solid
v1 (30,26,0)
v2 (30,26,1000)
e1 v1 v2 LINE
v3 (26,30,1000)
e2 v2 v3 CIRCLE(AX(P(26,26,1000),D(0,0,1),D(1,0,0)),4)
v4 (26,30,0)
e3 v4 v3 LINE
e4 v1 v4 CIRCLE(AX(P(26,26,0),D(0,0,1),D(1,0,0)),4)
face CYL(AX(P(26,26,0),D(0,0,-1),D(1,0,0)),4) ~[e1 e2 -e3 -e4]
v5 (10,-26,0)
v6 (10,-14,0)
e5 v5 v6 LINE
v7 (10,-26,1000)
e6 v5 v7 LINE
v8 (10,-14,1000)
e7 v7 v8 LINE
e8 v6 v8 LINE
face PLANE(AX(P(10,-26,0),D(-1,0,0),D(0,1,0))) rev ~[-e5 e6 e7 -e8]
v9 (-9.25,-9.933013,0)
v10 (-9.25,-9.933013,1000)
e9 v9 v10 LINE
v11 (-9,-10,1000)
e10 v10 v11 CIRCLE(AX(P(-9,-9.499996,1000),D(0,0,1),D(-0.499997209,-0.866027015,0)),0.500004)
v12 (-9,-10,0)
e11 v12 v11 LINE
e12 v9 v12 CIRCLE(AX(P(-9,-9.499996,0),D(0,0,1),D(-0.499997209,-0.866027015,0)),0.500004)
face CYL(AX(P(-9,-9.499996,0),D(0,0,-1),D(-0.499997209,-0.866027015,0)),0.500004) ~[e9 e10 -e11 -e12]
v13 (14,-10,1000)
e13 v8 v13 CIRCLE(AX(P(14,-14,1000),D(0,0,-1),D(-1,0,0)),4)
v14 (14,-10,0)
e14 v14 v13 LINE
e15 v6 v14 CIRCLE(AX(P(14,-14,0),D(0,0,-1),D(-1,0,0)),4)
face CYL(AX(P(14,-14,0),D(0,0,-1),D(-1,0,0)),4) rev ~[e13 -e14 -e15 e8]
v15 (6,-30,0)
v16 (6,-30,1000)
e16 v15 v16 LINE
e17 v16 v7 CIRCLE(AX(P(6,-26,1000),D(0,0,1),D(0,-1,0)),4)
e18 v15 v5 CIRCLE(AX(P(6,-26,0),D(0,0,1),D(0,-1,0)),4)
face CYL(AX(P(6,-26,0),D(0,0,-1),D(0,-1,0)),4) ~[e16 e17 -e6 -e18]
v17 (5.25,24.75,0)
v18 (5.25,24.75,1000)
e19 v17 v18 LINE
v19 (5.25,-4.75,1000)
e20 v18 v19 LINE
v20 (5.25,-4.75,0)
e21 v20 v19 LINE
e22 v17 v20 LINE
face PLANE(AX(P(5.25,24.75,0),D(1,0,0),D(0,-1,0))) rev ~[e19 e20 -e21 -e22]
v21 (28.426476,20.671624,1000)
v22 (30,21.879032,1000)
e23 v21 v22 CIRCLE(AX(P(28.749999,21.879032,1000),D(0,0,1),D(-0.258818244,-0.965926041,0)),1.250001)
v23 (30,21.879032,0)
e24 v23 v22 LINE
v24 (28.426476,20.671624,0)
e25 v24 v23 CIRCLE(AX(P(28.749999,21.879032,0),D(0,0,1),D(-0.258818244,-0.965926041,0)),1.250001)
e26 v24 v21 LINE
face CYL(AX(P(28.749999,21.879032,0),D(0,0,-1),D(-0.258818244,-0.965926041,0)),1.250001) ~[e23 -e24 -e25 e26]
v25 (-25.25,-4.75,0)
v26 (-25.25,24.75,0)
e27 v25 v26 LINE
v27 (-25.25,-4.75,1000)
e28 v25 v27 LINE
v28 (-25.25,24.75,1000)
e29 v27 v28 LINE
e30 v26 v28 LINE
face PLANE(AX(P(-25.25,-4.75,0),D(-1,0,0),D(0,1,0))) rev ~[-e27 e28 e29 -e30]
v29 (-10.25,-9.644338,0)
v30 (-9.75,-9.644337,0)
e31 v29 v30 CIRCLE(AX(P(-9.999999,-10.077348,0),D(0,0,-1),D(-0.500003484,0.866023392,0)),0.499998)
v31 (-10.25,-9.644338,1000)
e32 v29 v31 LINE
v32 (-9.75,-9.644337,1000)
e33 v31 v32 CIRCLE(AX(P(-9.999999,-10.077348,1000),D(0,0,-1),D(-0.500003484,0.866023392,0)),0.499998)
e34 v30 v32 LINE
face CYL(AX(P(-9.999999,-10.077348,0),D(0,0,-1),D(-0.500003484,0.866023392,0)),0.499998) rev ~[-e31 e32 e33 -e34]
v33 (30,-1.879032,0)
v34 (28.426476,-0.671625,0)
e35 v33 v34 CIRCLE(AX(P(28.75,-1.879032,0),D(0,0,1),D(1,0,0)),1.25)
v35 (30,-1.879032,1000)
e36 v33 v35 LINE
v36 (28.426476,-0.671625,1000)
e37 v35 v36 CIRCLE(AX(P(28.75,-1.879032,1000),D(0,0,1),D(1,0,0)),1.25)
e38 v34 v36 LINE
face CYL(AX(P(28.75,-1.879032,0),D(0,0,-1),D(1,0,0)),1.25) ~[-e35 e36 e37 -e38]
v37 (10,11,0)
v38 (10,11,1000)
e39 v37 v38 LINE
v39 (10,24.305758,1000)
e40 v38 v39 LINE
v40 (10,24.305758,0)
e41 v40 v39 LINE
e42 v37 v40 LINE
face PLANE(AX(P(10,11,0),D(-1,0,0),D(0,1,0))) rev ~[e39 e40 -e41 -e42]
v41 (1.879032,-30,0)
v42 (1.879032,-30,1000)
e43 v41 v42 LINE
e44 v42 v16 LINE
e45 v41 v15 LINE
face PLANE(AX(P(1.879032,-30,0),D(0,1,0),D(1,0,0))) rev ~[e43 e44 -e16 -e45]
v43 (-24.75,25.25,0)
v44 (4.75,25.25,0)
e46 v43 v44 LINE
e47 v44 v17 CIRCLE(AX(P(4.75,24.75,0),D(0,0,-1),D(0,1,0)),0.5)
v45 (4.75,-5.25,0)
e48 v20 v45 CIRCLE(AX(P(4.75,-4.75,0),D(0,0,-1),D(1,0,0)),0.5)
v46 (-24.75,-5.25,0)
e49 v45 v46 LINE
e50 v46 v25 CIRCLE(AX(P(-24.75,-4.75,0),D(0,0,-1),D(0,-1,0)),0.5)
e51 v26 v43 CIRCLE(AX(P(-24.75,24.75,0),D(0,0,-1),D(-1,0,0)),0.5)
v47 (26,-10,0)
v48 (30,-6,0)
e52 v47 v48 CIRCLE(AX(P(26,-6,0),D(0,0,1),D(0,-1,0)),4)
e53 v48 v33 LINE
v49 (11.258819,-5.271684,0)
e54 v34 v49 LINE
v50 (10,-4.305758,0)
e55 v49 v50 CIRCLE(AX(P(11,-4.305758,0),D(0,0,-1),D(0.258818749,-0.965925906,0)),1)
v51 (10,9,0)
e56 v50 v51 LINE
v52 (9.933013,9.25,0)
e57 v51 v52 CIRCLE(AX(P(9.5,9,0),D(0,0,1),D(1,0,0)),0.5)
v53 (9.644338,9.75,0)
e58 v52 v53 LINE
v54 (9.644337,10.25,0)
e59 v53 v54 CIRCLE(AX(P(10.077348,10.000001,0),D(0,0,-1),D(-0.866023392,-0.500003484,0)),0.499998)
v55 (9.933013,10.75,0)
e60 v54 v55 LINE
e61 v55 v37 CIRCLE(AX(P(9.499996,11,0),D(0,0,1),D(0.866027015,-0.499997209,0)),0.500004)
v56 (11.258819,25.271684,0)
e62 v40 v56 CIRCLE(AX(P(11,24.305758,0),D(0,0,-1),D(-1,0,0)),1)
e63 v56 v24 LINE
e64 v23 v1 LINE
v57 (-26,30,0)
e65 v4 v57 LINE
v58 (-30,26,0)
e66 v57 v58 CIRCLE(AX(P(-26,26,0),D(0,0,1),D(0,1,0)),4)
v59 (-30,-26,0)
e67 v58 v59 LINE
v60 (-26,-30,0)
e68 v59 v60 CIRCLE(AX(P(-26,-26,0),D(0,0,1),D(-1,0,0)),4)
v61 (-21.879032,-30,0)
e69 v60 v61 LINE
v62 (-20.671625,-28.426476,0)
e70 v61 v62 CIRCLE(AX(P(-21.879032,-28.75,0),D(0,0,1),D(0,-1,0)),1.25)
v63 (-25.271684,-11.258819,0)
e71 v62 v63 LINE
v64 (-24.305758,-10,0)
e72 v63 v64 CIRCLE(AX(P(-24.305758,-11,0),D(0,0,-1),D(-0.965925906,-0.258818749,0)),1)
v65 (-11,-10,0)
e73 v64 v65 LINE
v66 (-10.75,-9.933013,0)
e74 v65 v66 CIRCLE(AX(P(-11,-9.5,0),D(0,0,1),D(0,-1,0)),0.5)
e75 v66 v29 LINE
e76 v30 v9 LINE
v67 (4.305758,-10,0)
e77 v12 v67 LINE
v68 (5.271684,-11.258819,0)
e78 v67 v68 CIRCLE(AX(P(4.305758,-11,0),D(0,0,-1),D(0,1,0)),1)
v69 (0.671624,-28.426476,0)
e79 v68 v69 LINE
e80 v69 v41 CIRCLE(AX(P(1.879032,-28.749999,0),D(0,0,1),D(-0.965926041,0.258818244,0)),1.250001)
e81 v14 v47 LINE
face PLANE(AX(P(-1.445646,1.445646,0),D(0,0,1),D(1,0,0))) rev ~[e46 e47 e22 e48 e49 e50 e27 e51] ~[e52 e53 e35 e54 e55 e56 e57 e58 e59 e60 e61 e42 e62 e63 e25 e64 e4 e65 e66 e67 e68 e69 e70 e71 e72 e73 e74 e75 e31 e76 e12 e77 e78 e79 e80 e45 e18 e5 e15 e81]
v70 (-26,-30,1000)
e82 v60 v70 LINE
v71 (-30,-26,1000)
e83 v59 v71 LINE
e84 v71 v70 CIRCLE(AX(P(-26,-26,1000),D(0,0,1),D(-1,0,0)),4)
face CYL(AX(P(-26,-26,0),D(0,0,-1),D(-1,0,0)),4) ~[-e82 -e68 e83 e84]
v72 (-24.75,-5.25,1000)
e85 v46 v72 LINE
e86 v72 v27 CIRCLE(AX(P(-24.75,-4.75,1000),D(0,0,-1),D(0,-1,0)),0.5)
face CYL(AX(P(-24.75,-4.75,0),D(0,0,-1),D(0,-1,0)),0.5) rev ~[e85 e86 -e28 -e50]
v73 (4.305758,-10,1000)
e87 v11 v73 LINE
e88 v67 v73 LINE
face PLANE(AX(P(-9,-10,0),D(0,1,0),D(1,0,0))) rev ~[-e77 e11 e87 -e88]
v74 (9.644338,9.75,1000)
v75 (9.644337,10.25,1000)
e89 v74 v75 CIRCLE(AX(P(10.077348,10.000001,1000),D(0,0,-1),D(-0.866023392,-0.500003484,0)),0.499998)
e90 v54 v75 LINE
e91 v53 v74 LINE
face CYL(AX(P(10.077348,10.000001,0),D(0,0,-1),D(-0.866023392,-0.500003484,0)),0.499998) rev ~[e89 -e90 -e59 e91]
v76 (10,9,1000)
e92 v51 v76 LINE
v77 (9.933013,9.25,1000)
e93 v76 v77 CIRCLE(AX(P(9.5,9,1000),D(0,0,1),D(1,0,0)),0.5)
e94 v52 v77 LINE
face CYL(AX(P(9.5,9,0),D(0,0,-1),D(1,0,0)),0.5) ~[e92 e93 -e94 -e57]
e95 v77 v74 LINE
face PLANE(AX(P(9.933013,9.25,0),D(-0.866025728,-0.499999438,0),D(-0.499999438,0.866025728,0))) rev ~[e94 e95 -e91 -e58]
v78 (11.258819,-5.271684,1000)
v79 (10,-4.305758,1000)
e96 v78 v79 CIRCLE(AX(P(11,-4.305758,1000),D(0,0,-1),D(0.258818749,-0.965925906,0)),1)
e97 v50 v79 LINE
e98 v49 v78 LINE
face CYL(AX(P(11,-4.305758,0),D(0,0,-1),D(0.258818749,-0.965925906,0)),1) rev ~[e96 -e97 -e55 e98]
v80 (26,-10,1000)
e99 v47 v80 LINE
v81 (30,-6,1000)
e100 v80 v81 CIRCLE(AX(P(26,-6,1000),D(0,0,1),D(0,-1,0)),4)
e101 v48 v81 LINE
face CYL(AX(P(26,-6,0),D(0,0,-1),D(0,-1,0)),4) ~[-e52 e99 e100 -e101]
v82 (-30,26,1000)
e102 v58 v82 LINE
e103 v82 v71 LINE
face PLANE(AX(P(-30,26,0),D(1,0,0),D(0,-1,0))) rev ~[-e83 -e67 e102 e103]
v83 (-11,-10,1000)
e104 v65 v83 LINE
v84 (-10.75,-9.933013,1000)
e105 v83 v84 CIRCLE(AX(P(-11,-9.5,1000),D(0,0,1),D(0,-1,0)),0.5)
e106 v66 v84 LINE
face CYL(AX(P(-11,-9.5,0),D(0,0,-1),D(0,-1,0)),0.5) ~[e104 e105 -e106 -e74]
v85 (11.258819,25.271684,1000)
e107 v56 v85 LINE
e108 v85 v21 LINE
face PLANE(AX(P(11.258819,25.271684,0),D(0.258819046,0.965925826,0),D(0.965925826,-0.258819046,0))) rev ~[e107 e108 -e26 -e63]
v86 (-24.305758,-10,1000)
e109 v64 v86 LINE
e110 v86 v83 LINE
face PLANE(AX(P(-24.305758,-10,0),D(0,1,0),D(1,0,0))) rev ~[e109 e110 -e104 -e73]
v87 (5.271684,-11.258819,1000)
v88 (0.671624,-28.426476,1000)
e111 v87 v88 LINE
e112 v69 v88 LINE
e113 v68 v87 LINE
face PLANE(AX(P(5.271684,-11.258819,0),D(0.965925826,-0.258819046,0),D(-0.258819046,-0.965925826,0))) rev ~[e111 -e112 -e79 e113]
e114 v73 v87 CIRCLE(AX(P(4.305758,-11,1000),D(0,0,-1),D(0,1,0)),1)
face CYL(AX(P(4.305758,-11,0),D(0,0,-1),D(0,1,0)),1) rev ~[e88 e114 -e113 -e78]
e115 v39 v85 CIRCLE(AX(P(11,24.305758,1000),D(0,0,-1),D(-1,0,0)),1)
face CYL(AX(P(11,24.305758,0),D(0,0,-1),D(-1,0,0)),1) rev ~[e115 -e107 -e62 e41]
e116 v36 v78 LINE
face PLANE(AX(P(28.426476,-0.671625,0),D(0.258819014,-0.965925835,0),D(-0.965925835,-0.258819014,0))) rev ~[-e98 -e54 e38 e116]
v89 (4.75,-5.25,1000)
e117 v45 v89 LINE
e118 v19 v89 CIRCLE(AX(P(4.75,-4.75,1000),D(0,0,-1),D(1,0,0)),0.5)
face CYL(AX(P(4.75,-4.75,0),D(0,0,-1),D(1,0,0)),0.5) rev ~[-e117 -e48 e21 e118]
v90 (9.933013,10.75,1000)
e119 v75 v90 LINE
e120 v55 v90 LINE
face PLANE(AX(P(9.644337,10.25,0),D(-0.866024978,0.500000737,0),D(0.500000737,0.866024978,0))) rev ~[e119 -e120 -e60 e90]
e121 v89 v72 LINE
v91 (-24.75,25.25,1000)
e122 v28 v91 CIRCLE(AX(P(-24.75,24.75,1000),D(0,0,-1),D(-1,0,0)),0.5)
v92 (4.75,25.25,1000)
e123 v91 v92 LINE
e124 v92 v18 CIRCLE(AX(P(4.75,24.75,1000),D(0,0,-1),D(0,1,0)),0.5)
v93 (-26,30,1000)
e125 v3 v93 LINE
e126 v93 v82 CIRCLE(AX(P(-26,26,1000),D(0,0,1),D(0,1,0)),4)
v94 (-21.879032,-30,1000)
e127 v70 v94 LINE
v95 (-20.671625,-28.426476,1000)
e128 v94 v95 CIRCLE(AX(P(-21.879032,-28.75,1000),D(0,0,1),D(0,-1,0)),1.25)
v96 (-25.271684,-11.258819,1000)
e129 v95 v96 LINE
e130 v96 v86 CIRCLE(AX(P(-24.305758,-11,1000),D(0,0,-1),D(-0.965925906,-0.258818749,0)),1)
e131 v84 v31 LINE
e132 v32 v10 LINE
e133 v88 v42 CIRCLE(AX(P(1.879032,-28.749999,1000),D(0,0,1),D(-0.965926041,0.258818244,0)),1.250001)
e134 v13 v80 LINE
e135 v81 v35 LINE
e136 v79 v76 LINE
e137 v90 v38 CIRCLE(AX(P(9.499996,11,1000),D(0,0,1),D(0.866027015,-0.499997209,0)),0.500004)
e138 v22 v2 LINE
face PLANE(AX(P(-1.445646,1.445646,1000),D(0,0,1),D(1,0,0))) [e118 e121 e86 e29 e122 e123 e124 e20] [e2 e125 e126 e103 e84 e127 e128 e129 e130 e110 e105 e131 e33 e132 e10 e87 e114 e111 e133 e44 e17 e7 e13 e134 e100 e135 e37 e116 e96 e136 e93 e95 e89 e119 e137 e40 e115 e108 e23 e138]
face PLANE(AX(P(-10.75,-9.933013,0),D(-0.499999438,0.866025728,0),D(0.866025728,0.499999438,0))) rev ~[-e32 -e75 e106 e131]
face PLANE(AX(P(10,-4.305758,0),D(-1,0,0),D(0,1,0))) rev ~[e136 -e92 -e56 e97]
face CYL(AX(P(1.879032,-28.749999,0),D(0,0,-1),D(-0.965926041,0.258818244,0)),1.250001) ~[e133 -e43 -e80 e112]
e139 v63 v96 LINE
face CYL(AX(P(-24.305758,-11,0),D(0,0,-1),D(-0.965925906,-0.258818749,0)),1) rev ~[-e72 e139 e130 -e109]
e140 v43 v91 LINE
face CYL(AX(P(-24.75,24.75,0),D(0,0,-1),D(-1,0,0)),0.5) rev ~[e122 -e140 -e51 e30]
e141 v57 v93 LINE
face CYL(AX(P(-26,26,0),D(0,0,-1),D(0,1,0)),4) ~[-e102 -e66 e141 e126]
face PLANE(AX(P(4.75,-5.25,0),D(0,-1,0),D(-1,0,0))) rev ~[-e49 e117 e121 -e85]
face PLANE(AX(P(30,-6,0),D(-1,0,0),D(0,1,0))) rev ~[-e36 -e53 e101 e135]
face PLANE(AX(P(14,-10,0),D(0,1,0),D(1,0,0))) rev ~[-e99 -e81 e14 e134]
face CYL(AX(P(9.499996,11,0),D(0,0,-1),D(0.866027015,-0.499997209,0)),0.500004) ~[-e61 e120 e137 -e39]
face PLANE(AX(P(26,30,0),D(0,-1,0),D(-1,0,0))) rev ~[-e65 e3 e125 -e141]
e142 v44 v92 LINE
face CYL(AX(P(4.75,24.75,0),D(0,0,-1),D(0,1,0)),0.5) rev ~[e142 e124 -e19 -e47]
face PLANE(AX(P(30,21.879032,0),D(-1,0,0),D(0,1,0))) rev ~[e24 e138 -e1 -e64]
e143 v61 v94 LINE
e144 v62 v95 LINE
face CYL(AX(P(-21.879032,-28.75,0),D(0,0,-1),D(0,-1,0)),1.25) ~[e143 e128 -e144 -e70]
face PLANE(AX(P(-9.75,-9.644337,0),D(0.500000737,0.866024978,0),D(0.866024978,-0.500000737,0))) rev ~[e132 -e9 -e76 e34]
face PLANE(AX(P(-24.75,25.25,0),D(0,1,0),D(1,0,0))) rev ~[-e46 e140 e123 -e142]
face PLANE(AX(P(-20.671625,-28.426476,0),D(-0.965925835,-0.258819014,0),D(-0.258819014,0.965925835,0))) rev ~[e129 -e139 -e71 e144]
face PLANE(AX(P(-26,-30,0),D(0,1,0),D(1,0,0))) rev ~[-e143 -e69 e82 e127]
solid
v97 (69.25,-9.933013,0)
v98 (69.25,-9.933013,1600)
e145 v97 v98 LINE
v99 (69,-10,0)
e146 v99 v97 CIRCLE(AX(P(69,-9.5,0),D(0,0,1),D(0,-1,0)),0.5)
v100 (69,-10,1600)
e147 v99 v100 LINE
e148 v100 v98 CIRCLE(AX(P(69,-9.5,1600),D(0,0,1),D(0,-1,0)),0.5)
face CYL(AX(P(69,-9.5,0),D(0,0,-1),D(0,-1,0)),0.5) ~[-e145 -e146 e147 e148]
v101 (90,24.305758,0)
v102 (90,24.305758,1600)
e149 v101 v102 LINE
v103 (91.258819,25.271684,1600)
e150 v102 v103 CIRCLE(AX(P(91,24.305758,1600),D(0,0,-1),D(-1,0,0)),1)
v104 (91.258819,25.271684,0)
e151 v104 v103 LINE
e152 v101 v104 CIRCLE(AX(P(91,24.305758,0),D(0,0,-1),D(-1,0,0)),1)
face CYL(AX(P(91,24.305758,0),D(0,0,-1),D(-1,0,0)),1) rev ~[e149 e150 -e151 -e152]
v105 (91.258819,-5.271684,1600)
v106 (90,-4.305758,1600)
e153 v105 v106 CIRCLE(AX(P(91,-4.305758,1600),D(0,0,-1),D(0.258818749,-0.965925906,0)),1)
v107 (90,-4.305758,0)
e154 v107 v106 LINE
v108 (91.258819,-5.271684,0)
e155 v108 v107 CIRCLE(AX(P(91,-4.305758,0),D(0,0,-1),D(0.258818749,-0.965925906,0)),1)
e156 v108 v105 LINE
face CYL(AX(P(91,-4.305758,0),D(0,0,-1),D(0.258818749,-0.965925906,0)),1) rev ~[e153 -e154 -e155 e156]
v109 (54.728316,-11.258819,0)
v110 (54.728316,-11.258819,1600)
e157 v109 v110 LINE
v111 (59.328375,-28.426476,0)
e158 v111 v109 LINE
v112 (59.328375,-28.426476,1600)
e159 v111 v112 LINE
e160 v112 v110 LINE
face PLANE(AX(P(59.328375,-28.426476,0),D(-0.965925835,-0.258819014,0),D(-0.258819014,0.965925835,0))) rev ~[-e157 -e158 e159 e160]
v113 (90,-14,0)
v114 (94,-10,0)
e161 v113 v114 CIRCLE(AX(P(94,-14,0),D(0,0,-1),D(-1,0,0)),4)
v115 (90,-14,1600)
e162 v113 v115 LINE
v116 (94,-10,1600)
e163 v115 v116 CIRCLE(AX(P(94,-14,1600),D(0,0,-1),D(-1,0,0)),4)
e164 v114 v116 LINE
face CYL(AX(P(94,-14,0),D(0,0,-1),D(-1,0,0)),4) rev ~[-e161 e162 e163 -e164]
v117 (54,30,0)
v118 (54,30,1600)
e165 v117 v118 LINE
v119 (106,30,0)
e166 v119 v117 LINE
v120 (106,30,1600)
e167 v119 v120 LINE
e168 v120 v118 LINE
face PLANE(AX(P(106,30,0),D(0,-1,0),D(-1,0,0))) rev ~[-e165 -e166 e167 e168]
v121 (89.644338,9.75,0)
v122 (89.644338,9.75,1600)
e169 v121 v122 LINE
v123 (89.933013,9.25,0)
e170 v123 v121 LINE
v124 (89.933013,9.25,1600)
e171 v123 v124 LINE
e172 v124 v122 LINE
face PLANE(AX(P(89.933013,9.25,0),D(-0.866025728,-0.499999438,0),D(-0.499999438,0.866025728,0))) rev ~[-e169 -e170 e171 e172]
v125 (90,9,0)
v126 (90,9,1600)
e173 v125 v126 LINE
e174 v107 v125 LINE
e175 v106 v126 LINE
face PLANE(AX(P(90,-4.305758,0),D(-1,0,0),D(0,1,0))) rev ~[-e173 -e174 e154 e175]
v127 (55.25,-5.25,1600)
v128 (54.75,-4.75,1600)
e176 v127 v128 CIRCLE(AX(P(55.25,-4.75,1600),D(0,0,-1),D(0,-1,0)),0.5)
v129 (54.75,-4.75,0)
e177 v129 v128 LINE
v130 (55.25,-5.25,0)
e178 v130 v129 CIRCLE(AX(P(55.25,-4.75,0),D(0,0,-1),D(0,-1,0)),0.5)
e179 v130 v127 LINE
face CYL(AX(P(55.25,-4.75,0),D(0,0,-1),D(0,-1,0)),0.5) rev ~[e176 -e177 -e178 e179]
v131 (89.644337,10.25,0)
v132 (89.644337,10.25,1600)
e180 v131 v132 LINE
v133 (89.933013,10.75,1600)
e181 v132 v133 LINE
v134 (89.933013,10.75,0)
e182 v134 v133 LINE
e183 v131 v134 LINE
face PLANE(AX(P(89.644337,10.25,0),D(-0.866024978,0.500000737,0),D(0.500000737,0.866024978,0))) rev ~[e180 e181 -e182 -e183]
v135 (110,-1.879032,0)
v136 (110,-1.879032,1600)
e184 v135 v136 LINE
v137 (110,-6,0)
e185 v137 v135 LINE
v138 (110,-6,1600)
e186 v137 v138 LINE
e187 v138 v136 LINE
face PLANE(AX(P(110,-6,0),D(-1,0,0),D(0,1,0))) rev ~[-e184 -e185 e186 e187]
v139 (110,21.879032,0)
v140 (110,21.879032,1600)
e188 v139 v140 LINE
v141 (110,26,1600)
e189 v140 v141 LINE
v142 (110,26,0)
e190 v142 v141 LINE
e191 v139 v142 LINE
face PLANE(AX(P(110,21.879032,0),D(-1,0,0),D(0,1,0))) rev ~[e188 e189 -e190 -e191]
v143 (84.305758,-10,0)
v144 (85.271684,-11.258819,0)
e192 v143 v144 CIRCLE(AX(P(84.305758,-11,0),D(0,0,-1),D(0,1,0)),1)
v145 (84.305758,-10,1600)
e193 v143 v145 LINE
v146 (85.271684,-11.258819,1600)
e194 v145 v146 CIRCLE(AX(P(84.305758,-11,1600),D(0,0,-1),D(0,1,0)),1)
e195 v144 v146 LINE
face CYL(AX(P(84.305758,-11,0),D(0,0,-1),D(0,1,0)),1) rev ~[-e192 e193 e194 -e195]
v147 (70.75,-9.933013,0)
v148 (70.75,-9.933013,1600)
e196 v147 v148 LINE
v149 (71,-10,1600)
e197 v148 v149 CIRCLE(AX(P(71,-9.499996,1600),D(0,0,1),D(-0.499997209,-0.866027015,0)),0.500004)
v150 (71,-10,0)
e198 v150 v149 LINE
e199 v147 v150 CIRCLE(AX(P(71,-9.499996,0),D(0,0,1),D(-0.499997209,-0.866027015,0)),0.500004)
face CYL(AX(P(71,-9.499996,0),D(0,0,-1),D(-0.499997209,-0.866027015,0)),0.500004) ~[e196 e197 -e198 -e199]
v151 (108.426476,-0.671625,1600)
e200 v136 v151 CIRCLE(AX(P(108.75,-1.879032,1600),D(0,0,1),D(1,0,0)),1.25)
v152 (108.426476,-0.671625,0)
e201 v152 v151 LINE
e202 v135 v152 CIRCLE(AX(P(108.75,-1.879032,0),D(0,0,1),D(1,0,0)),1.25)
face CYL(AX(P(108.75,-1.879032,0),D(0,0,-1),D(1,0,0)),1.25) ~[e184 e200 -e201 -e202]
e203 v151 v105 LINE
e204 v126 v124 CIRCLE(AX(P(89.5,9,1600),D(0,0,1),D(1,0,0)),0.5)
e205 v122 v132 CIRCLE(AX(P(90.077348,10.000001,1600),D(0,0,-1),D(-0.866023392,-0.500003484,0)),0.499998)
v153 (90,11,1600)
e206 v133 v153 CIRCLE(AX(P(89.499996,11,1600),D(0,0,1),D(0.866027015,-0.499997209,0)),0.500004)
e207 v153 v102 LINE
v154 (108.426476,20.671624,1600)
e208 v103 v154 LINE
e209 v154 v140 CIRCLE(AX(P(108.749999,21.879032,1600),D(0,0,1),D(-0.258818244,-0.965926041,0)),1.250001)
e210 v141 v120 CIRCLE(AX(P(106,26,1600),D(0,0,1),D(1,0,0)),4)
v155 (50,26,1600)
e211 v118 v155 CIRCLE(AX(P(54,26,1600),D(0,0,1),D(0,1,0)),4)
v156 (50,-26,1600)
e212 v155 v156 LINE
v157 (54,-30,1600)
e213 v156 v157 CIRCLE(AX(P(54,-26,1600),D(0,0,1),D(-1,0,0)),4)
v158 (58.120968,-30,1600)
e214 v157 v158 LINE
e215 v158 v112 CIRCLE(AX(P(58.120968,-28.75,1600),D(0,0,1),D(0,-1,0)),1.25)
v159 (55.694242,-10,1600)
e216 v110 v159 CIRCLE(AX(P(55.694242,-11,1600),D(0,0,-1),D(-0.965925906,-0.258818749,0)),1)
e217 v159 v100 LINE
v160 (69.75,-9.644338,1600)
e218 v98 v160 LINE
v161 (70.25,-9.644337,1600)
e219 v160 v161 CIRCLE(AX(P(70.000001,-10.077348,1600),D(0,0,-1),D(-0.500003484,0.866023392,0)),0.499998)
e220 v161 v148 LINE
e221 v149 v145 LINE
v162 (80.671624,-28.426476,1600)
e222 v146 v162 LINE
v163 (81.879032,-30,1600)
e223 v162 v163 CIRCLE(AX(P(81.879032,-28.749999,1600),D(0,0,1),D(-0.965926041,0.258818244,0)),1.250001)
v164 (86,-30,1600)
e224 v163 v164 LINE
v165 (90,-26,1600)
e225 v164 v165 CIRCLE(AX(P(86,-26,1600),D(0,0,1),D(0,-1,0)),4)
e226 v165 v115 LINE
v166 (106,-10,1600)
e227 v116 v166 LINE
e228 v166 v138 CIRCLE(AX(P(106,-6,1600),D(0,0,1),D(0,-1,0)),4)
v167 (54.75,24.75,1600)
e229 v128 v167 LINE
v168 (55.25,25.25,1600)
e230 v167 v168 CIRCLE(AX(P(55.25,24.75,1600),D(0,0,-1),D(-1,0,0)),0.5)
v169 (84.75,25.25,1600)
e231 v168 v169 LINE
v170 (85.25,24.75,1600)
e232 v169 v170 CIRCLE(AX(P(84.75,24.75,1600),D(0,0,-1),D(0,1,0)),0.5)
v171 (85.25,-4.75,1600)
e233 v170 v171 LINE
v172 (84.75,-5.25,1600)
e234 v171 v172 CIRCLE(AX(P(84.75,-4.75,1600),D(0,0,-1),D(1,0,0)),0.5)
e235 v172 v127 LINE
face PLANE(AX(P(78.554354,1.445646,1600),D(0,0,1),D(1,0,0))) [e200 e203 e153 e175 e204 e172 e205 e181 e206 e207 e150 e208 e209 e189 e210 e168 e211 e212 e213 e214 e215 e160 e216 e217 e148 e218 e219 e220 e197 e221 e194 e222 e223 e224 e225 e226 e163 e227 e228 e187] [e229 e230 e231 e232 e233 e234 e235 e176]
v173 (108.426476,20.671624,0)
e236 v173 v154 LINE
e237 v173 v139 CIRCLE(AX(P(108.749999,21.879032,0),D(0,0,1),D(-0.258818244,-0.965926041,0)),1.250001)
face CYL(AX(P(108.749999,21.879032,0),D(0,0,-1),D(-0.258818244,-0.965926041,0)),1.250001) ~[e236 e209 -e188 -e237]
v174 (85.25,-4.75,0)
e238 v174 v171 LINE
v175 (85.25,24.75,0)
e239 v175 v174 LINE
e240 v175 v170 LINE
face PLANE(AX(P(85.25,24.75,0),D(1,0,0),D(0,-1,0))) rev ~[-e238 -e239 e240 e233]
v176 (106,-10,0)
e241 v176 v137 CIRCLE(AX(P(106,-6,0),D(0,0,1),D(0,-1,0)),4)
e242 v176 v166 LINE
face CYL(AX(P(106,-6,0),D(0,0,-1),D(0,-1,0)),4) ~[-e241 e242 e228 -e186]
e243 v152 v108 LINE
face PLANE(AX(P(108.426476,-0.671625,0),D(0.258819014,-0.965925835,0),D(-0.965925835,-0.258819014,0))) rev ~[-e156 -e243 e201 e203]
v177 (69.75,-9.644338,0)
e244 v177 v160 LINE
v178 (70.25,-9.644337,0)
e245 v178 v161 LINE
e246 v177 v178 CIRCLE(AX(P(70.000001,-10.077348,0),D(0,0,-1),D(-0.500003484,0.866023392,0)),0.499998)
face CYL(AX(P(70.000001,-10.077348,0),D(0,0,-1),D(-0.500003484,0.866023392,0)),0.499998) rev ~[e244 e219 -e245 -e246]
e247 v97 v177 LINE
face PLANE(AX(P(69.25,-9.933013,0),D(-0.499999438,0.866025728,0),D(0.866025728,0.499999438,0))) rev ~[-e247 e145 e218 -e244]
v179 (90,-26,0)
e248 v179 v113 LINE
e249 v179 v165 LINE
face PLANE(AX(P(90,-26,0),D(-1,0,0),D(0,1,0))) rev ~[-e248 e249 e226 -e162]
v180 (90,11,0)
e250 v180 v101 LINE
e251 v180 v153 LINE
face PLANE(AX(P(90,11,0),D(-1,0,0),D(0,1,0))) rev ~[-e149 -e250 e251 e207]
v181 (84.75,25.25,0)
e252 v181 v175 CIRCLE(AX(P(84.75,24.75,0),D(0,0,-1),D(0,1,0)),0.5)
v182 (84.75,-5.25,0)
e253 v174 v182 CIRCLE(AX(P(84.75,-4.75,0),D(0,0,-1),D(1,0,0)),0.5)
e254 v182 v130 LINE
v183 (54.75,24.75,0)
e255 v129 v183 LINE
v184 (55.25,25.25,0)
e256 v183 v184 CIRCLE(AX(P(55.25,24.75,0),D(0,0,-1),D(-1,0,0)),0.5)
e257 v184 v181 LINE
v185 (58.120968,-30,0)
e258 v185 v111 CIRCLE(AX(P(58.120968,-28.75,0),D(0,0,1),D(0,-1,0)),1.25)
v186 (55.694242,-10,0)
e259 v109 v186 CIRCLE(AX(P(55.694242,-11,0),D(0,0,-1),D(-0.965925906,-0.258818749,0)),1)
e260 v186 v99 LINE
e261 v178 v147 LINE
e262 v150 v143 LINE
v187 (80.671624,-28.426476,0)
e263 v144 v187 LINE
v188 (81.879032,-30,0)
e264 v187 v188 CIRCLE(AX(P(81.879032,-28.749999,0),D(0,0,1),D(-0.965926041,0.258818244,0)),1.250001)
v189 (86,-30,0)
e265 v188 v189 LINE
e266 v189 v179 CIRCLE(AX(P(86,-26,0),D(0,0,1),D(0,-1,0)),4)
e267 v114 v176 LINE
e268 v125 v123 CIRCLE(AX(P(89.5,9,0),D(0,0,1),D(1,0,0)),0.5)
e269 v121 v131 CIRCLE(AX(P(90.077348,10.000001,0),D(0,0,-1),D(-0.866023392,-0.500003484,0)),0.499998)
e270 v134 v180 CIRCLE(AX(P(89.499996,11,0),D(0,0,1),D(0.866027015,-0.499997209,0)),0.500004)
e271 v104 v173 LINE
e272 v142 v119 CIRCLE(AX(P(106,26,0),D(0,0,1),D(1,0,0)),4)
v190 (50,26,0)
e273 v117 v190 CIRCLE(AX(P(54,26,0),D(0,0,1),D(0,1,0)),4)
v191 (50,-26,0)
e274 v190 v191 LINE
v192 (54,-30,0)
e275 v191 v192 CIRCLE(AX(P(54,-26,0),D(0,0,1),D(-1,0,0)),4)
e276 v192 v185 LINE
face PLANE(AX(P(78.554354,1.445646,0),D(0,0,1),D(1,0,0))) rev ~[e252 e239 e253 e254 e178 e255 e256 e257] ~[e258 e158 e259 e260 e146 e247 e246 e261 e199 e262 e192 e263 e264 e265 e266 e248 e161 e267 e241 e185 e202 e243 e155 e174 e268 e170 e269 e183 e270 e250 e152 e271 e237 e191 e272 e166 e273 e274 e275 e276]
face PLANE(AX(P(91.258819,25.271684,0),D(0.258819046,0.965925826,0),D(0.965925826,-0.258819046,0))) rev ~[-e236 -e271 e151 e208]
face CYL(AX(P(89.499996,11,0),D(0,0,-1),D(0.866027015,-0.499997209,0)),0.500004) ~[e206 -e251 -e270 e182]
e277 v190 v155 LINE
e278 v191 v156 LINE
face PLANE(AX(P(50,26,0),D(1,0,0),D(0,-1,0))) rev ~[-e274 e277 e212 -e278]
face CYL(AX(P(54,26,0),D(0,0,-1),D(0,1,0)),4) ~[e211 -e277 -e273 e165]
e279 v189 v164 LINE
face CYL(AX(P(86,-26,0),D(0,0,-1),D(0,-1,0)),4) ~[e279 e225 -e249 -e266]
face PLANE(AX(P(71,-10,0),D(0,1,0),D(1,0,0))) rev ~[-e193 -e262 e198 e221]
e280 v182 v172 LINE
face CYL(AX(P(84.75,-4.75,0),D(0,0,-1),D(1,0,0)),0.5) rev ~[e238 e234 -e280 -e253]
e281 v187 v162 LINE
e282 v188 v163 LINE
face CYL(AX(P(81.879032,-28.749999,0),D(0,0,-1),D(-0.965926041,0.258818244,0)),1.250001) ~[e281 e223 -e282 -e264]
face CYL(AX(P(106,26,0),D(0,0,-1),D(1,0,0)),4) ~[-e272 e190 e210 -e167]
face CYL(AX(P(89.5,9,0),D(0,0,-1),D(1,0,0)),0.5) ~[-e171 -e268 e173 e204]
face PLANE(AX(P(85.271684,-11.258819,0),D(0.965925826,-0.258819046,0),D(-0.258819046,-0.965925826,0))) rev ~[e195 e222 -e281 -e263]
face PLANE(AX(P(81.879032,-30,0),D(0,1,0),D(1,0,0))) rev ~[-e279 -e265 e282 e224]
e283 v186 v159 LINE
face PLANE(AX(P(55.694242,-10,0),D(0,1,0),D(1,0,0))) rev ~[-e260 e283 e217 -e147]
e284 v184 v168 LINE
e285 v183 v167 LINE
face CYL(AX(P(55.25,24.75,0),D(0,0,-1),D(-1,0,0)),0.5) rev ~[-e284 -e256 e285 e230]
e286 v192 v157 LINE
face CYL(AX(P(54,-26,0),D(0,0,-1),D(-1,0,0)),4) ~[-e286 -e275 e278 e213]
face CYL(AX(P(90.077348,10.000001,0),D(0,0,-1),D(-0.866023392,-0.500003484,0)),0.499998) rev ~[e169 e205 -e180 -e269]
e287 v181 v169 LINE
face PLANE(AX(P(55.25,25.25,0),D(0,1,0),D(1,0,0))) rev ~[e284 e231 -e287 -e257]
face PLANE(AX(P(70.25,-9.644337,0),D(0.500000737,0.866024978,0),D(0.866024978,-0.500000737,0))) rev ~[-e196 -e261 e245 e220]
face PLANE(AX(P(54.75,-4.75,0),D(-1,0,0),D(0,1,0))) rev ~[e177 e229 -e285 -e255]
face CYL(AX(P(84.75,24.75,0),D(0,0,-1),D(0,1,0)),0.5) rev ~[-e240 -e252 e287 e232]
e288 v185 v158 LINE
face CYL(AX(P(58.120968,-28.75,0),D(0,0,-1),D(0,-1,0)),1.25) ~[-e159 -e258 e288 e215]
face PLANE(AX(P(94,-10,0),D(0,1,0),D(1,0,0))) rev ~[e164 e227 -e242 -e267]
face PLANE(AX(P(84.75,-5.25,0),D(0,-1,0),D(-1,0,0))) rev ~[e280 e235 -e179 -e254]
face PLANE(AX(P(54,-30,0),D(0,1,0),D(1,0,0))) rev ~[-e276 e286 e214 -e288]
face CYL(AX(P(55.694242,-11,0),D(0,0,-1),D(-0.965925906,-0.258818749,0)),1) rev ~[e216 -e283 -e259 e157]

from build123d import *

# Parameters (mm, degrees)
F1_DEPTH = 1000
F2_DEPTH = 1600


# Not quite as in the source:
# - ends of sketch curves that miss each other by under 0.0002 mm in the source are joined


with BuildPart() as f1:
    # F0 (on Top) → F1 (new body)
    with BuildSketch(Plane.XY):
        with BuildLine():
            ThreePointArc((30, -1.879032), (29.5109517857, -0.8873403242), (28.4264761923, -0.6716247175))
            Line((28.4264761923, -0.6716247175), (11.258819, -5.271684))
            ThreePointArc((11.258819, -5.271684), (10.3912385359, -5.0991113133), (10, -4.305758))
            Line((10, -4.305758), (10, 9))
            ThreePointArc((10, 9), (9.9829629324, 9.1294094506), (9.9330127764, 9.2499998709))
            Line((9.9330127764, 9.2499998709), (9.644338, 9.75))
            ThreePointArc((9.644338, 9.75), (9.57735, 10), (9.6443374736, 10.2500003039))
            Line((9.6443374736, 10.2500003039), (9.933013, 10.75))
            ThreePointArc((9.933013, 10.75), (9.9829629324, 10.8705905494), (10, 11))
            Line((10, 11), (10, 24.305758))
            ThreePointArc((10, 24.305758), (10.3912385359, 25.0991113133), (11.2588189596, 25.2716838492))
            Line((11.2588189596, 25.2716838492), (28.426476, 20.671624))
            ThreePointArc((28.426476, 20.671624), (29.5109517857, 20.8873403242), (30, 21.879032))
            Line((30, 21.879032), (30, 26))
            ThreePointArc((30, 26), (28.8284271247, 28.8284271247), (26, 30))
            Line((26, 30), (-26, 30))
            ThreePointArc((-26, 30), (-28.8284271247, 28.8284271247), (-30, 26))
            Line((-30, 26), (-30, -26))
            ThreePointArc((-30, -26), (-28.8284271247, -28.8284271247), (-26, -30))
            Line((-26, -30), (-21.879032, -30))
            ThreePointArc((-21.879032, -30), (-20.8873403242, -29.5109517857), (-20.6716247175, -28.4264761923))
            Line((-20.6716247175, -28.4264761923), (-25.271684, -11.258819))
            ThreePointArc((-25.271684, -11.258819), (-25.0991113133, -10.3912385359), (-24.305758, -10))
            Line((-24.305758, -10), (-11, -10))
            ThreePointArc((-11, -10), (-10.8705905494, -9.9829629324), (-10.7500001291, -9.9330127764))
            Line((-10.7500001291, -9.9330127764), (-10.25, -9.644338))
            ThreePointArc((-10.25, -9.644338), (-10, -9.57735), (-9.7499996961, -9.6443374736))
            Line((-9.7499996961, -9.6443374736), (-9.25, -9.933013))
            ThreePointArc((-9.25, -9.933013), (-9.1294094506, -9.9829629324), (-9, -10))
            Line((-9, -10), (4.305758, -10))
            ThreePointArc((4.305758, -10), (5.0991113133, -10.3912385359), (5.2716838492, -11.2588189596))
            Line((5.2716838492, -11.2588189596), (0.671624, -28.426476))
            ThreePointArc((0.671624, -28.426476), (0.8873403242, -29.5109517857), (1.879032, -30))
            Line((1.879032, -30), (6, -30))
            ThreePointArc((6, -30), (8.8284271247, -28.8284271247), (10, -26))
            Line((10, -26), (10, -14))
            ThreePointArc((10, -14), (11.1715728753, -11.1715728753), (14, -10))
            Line((14, -10), (26, -10))
            ThreePointArc((26, -10), (28.8284271247, -8.8284271247), (30, -6))
            Line((30, -6), (30, -1.879032))
        make_face()
        with BuildLine():
            Line((5.25, 24.75), (5.25, -4.75))
            ThreePointArc((5.25, -4.75), (5.1035533906, -5.1035533906), (4.75, -5.25))
            Line((4.75, -5.25), (-24.75, -5.25))
            ThreePointArc((-24.75, -5.25), (-25.1035533906, -5.1035533906), (-25.25, -4.75))
            Line((-25.25, -4.75), (-25.25, 24.75))
            ThreePointArc((-25.25, 24.75), (-25.1035533906, 25.1035533906), (-24.75, 25.25))
            Line((-24.75, 25.25), (4.75, 25.25))
            ThreePointArc((4.75, 25.25), (5.1035533906, 25.1035533906), (5.25, 24.75))
        make_face(mode=Mode.SUBTRACT)
    extrude(amount=F1_DEPTH)


with BuildPart() as f2:
    # F0 (on Top) → F2 (new body)
    with BuildSketch(Plane.XY):
        with BuildLine():
            ThreePointArc((110, -1.879032), (109.5109517857, -0.8873403242), (108.4264761923, -0.6716247175))
            Line((108.4264761923, -0.6716247175), (91.258819, -5.271684))
            ThreePointArc((91.258819, -5.271684), (90.3912385359, -5.0991113133), (90, -4.305758))
            Line((90, -4.305758), (90, 9))
            ThreePointArc((90, 9), (89.9829629324, 9.1294094506), (89.9330127764, 9.2499998709))
            Line((89.9330127764, 9.2499998709), (89.644338, 9.75))
            ThreePointArc((89.644338, 9.75), (89.57735, 10), (89.6443374736, 10.2500003039))
            Line((89.6443374736, 10.2500003039), (89.933013, 10.75))
            ThreePointArc((89.933013, 10.75), (89.9829629324, 10.8705905494), (90, 11))
            Line((90, 11), (90, 24.305758))
            ThreePointArc((90, 24.305758), (90.3912385359, 25.0991113133), (91.2588189596, 25.2716838492))
            Line((91.2588189596, 25.2716838492), (108.426476, 20.671624))
            ThreePointArc((108.426476, 20.671624), (109.5109517857, 20.8873403242), (110, 21.879032))
            Line((110, 21.879032), (110, 26))
            ThreePointArc((110, 26), (108.8284271247, 28.8284271247), (106, 30))
            Line((106, 30), (54, 30))
            ThreePointArc((54, 30), (51.1715728753, 28.8284271247), (50, 26))
            Line((50, 26), (50, -26))
            ThreePointArc((50, -26), (51.1715728753, -28.8284271247), (54, -30))
            Line((54, -30), (58.120968, -30))
            ThreePointArc((58.120968, -30), (59.1126596758, -29.5109517857), (59.3283752825, -28.4264761923))
            Line((59.3283752825, -28.4264761923), (54.728316, -11.258819))
            ThreePointArc((54.728316, -11.258819), (54.9008886867, -10.3912385359), (55.694242, -10))
            Line((55.694242, -10), (69, -10))
            ThreePointArc((69, -10), (69.1294094506, -9.9829629324), (69.2499998709, -9.9330127764))
            Line((69.2499998709, -9.9330127764), (69.75, -9.644338))
            ThreePointArc((69.75, -9.644338), (70, -9.57735), (70.2500003039, -9.6443374736))
            Line((70.2500003039, -9.6443374736), (70.75, -9.933013))
            ThreePointArc((70.75, -9.933013), (70.8705905494, -9.9829629324), (71, -10))
            Line((71, -10), (84.305758, -10))
            ThreePointArc((84.305758, -10), (85.0991113133, -10.3912385359), (85.2716838492, -11.2588189596))
            Line((85.2716838492, -11.2588189596), (80.671624, -28.426476))
            ThreePointArc((80.671624, -28.426476), (80.8873403242, -29.5109517857), (81.879032, -30))
            Line((81.879032, -30), (86, -30))
            ThreePointArc((86, -30), (88.8284271247, -28.8284271247), (90, -26))
            Line((90, -26), (90, -14))
            ThreePointArc((90, -14), (91.1715728753, -11.1715728753), (94, -10))
            Line((94, -10), (106, -10))
            ThreePointArc((106, -10), (108.8284271247, -8.8284271247), (110, -6))
            Line((110, -6), (110, -1.879032))
        make_face()
        with BuildLine():
            Line((84.75, -5.25), (55.25, -5.25))
            ThreePointArc((55.25, -5.25), (54.8964466094, -5.1035533906), (54.75, -4.75))
            Line((54.75, -4.75), (54.75, 24.75))
            ThreePointArc((54.75, 24.75), (54.8964466094, 25.1035533906), (55.25, 25.25))
            Line((55.25, 25.25), (84.75, 25.25))
            ThreePointArc((84.75, 25.25), (85.1035533906, 25.1035533906), (85.25, 24.75))
            Line((85.25, 24.75), (85.25, -4.75))
            ThreePointArc((85.25, -4.75), (85.1035533906, -5.1035533906), (84.75, -5.25))
        make_face(mode=Mode.SUBTRACT)
    extrude(amount=F2_DEPTH)


solid = Compound([f1.part, f2.part])
